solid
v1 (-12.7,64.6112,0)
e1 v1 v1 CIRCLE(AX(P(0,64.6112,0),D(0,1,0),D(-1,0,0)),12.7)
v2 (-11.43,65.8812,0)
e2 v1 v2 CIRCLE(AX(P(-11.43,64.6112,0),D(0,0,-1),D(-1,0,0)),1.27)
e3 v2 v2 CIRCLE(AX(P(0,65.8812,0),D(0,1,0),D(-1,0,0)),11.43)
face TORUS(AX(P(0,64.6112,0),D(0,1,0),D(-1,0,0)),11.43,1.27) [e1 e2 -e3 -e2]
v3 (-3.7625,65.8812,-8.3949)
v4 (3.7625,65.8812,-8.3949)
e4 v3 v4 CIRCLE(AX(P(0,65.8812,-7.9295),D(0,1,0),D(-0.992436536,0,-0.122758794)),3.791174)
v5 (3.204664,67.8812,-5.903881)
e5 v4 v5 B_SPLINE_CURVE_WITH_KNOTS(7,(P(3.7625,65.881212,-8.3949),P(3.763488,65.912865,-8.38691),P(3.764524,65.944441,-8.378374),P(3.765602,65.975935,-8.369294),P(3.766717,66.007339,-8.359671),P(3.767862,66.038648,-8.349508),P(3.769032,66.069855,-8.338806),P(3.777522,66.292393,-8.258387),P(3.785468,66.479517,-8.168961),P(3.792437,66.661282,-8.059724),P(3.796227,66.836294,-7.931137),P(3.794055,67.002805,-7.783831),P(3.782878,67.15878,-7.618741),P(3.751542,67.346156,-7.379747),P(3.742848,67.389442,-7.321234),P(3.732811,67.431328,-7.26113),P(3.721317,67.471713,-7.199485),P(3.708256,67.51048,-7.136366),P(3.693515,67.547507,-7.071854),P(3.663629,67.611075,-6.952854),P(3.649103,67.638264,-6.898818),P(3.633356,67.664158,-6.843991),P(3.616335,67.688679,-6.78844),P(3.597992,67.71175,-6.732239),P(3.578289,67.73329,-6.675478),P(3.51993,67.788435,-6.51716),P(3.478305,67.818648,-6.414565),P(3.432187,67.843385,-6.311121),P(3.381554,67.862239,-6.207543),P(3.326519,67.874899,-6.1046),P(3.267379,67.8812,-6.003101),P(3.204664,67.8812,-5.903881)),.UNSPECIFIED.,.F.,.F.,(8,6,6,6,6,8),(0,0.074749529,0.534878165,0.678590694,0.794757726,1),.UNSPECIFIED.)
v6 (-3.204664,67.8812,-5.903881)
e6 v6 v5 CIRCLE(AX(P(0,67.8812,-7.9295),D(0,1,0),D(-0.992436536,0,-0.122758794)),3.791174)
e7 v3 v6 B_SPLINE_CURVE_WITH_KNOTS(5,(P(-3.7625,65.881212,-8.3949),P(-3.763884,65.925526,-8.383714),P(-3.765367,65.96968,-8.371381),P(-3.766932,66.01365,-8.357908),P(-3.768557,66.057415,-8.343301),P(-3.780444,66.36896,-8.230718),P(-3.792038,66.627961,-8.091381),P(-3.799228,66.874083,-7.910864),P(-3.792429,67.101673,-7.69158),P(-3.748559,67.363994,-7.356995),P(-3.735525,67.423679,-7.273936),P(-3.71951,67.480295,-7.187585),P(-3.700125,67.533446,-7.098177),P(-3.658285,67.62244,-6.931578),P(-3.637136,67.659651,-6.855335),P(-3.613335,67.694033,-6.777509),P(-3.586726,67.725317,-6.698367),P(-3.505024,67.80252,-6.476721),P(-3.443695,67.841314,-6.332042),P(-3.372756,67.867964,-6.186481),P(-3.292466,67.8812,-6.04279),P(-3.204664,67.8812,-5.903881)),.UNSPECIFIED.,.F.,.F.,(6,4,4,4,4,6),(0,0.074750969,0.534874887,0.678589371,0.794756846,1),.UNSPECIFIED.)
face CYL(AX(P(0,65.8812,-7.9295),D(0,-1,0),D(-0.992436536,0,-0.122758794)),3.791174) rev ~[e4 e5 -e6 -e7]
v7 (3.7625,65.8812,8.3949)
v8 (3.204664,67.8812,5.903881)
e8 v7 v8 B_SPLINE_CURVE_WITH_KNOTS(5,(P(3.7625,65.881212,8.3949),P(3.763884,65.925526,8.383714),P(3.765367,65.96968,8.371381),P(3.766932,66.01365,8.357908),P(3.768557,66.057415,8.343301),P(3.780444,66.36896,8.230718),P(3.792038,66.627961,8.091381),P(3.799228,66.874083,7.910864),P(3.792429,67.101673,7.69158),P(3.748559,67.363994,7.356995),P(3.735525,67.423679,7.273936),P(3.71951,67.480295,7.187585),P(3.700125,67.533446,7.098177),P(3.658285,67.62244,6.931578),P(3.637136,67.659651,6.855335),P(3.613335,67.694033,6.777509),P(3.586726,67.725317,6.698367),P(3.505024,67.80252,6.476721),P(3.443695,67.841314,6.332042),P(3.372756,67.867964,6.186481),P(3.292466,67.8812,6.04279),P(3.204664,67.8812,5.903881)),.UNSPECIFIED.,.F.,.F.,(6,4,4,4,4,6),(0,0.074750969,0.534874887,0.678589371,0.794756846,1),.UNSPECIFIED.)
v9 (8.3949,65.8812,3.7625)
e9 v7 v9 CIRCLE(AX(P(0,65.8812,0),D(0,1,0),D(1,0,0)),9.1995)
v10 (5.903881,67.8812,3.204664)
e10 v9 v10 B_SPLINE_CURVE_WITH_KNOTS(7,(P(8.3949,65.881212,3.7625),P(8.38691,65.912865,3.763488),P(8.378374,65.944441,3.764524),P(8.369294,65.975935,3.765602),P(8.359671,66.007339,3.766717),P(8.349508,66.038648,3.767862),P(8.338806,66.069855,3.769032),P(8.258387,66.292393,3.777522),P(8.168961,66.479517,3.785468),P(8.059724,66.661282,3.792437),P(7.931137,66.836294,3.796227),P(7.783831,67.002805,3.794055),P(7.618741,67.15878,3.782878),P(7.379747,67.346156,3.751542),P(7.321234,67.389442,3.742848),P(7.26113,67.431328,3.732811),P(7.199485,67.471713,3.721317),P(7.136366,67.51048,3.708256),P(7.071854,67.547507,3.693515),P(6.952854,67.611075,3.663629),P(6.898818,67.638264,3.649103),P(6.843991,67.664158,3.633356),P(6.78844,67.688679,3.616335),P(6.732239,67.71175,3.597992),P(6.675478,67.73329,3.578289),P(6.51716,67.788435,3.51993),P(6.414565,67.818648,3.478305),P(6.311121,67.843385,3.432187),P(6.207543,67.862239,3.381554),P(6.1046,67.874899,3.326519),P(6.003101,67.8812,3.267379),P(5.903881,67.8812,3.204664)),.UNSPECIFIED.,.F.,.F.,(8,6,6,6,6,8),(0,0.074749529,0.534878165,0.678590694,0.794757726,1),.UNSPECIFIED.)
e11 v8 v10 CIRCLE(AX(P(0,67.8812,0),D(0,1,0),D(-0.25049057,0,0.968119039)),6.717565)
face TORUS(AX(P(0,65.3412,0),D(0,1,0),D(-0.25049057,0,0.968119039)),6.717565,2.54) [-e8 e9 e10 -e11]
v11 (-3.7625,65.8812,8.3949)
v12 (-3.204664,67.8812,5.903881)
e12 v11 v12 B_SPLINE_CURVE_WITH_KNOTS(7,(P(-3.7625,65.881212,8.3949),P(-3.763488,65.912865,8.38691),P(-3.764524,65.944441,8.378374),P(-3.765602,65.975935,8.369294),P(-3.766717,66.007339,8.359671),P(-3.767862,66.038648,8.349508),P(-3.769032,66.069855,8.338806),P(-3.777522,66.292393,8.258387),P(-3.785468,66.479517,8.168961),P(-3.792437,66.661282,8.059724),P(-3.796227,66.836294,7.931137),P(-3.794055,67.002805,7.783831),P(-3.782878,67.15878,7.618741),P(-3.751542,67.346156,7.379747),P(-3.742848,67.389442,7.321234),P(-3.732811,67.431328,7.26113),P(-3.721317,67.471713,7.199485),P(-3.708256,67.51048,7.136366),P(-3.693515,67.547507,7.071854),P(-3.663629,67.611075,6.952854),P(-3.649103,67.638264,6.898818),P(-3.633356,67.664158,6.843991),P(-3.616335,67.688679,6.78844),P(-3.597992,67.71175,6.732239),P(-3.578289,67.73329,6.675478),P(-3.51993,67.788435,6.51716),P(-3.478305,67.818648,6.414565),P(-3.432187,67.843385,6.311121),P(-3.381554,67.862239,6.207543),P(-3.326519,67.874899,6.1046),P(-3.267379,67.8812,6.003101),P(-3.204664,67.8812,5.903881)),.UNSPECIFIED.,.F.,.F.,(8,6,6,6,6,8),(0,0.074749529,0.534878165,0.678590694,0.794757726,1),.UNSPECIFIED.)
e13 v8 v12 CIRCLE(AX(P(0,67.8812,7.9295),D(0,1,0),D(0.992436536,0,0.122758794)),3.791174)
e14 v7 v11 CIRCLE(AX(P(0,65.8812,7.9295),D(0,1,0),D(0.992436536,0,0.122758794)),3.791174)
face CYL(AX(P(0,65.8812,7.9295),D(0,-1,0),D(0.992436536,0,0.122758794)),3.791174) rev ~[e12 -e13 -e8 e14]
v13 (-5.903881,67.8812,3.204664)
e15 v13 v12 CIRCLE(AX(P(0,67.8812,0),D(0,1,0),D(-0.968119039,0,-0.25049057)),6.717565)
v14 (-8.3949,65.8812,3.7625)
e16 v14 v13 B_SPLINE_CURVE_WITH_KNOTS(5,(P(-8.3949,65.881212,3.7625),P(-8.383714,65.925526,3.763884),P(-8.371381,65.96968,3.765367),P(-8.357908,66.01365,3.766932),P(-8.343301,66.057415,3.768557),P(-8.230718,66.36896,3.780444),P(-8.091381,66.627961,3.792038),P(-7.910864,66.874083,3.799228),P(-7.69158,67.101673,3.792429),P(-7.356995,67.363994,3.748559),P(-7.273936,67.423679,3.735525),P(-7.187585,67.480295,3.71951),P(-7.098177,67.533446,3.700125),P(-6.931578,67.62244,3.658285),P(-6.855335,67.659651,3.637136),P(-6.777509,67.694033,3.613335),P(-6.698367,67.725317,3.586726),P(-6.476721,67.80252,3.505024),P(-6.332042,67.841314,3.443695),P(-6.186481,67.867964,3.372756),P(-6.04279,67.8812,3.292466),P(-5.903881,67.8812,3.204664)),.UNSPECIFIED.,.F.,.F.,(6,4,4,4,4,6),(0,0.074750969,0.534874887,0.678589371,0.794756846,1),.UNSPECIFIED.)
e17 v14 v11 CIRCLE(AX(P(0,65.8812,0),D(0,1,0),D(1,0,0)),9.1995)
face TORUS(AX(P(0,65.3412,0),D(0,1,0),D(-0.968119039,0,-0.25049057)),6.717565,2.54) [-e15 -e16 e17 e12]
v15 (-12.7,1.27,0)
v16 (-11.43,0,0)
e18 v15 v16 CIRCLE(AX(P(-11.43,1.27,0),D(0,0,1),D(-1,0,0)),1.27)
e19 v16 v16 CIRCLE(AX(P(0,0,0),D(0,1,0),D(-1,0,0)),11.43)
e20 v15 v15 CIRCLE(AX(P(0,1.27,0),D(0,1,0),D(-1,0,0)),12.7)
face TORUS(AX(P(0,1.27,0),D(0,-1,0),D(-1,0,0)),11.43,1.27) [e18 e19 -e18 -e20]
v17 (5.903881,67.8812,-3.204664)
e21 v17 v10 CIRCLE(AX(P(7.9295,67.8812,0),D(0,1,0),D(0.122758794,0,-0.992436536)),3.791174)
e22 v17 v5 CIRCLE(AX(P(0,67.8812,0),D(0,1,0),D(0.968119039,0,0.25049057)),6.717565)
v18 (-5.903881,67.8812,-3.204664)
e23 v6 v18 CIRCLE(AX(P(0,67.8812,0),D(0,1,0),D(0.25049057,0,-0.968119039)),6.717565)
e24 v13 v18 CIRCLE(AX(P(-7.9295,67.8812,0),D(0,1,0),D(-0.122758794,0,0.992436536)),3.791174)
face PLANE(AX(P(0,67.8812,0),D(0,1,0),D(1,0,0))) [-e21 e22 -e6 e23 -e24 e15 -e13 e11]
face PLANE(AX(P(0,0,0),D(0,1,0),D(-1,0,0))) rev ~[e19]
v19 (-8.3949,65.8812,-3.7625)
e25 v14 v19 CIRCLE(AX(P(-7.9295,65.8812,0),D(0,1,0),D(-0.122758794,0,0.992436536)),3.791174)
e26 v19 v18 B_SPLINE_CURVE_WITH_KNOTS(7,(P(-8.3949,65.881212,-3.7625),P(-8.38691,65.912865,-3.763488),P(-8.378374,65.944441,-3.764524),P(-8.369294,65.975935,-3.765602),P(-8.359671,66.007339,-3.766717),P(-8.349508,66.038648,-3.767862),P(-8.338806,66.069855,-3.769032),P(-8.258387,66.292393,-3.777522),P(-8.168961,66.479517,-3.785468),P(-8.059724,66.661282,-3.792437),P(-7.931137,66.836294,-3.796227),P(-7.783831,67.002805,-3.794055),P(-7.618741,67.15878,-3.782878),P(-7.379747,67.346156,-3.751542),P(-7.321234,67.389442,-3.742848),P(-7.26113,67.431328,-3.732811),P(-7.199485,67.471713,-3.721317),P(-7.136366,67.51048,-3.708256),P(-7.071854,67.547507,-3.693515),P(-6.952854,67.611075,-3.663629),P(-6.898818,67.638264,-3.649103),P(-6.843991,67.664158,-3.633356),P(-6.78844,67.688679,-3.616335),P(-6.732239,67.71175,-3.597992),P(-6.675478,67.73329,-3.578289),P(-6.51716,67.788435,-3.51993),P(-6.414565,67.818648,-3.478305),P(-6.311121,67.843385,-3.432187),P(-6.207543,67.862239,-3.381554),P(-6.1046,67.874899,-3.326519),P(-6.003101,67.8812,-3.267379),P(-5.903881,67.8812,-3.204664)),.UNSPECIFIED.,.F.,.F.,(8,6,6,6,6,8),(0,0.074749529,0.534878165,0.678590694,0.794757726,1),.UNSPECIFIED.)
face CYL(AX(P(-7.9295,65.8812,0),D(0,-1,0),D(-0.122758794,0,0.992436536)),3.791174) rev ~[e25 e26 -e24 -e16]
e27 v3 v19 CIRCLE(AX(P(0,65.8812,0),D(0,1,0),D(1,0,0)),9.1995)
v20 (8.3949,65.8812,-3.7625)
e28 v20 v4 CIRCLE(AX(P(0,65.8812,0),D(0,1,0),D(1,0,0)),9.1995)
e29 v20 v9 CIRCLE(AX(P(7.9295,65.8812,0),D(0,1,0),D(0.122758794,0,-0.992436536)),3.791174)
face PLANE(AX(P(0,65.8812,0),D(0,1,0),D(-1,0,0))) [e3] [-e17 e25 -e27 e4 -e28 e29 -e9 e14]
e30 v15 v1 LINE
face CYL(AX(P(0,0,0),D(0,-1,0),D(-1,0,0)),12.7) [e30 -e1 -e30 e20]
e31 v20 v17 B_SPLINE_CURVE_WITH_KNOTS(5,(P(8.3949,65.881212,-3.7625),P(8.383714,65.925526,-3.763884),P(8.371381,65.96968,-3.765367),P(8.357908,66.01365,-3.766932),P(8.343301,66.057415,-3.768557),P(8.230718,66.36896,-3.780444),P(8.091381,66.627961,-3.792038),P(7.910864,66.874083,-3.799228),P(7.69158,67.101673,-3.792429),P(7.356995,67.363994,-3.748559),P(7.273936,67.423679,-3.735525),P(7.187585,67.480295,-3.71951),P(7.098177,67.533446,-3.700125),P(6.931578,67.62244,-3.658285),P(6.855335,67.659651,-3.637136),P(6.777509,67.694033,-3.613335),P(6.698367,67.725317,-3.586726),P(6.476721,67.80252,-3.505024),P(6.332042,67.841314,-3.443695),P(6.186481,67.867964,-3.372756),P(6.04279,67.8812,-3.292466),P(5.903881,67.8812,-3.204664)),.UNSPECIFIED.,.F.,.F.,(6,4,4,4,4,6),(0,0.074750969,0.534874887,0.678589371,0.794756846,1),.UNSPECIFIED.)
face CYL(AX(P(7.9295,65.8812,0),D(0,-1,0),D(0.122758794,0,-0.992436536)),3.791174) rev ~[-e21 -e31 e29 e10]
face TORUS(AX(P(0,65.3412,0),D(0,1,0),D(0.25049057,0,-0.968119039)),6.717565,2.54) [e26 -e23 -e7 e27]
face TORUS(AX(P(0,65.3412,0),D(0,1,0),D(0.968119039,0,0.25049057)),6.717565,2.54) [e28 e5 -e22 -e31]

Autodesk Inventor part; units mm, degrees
ref_plane "YZ Plane" through (0, 0, 0) normal (1, 0, 0) x (0, 1, 0)
ref_plane "XZ Plane" through (0, 0, 0) normal (0, 1, 0) x (-1, 0, 0)
ref_plane "XY Plane" through (0, 0, 0) normal (0, 0, 1) x (1, 0, 0)
sketch "Sketch1" plane through (0, 0, 0) normal (0, 1, 0) x (-1, 0, 0)
  circle A0 centre (0, 0) radius 12.7
  dimension "d0" = 25.4
extrude "Extrusion1" add sketch "Sketch1" along normal blind 65.8812
fillet "Fillet1" radius 1.27 2 edges at (12.7, 65.8812, 0) (12.7, 0, 0)
sketch "Sketch2" plane through (0, 65.8812, 0) normal (0, 1, 0) x (1, 0, 0)
  circle A0 centre (0, 0) radius 9.1995
  arc A1 (-8.3949, -3.7625) -> (-8.3949, 3.7625) centre (-7.9295, 0) ccw
  arc A2 (3.7625, -8.3949) -> (-3.7625, -8.3949) centre (0, -7.9295) ccw
  arc A3 (8.3949, 3.7625) -> (8.3949, -3.7625) centre (7.9295, 0) ccw
  arc A4 (-3.7625, 8.3949) -> (3.7625, 8.3949) centre (0, 7.9295) ccw
  circle A5 centre (0, 0) radius 7.9295 construction
  line L0 (-3.7625, -8.3949) -> (3.7625, -8.3949) construction
  line L1 (8.3949, -3.7625) -> (8.3949, 3.7625) construction
  line L2 (3.7625, 8.3949) -> (-3.7625, 8.3949) construction
  line L3 (-8.3949, 3.7625) -> (-8.3949, -3.7625) construction
  point P0 (3.7625, 8.3949)
  point P1 (-3.7625, 8.3949)
  point P2 (-3.7625, -8.3949)
  point P3 (3.7625, -8.3949)
  point P4 (8.3949, -3.7625)
  point P5 (8.3949, 3.7625)
  dimension "d6" = 360
  dimension "d8" = 1.27
extrude "Extrusion2" add sketch "Sketch2" along normal blind 2 contours A3 A0 A2 A1 A4
fillet "Fillet2" radius 2.54 4 edges at (6.5051, 67.8812, 6.5051) (-6.5051, 67.8812, 6.5051) (-6.5051, 67.8812, -6.5051) (6.5051, 67.8812, -6.5051)
properties part number "BigBattery"
